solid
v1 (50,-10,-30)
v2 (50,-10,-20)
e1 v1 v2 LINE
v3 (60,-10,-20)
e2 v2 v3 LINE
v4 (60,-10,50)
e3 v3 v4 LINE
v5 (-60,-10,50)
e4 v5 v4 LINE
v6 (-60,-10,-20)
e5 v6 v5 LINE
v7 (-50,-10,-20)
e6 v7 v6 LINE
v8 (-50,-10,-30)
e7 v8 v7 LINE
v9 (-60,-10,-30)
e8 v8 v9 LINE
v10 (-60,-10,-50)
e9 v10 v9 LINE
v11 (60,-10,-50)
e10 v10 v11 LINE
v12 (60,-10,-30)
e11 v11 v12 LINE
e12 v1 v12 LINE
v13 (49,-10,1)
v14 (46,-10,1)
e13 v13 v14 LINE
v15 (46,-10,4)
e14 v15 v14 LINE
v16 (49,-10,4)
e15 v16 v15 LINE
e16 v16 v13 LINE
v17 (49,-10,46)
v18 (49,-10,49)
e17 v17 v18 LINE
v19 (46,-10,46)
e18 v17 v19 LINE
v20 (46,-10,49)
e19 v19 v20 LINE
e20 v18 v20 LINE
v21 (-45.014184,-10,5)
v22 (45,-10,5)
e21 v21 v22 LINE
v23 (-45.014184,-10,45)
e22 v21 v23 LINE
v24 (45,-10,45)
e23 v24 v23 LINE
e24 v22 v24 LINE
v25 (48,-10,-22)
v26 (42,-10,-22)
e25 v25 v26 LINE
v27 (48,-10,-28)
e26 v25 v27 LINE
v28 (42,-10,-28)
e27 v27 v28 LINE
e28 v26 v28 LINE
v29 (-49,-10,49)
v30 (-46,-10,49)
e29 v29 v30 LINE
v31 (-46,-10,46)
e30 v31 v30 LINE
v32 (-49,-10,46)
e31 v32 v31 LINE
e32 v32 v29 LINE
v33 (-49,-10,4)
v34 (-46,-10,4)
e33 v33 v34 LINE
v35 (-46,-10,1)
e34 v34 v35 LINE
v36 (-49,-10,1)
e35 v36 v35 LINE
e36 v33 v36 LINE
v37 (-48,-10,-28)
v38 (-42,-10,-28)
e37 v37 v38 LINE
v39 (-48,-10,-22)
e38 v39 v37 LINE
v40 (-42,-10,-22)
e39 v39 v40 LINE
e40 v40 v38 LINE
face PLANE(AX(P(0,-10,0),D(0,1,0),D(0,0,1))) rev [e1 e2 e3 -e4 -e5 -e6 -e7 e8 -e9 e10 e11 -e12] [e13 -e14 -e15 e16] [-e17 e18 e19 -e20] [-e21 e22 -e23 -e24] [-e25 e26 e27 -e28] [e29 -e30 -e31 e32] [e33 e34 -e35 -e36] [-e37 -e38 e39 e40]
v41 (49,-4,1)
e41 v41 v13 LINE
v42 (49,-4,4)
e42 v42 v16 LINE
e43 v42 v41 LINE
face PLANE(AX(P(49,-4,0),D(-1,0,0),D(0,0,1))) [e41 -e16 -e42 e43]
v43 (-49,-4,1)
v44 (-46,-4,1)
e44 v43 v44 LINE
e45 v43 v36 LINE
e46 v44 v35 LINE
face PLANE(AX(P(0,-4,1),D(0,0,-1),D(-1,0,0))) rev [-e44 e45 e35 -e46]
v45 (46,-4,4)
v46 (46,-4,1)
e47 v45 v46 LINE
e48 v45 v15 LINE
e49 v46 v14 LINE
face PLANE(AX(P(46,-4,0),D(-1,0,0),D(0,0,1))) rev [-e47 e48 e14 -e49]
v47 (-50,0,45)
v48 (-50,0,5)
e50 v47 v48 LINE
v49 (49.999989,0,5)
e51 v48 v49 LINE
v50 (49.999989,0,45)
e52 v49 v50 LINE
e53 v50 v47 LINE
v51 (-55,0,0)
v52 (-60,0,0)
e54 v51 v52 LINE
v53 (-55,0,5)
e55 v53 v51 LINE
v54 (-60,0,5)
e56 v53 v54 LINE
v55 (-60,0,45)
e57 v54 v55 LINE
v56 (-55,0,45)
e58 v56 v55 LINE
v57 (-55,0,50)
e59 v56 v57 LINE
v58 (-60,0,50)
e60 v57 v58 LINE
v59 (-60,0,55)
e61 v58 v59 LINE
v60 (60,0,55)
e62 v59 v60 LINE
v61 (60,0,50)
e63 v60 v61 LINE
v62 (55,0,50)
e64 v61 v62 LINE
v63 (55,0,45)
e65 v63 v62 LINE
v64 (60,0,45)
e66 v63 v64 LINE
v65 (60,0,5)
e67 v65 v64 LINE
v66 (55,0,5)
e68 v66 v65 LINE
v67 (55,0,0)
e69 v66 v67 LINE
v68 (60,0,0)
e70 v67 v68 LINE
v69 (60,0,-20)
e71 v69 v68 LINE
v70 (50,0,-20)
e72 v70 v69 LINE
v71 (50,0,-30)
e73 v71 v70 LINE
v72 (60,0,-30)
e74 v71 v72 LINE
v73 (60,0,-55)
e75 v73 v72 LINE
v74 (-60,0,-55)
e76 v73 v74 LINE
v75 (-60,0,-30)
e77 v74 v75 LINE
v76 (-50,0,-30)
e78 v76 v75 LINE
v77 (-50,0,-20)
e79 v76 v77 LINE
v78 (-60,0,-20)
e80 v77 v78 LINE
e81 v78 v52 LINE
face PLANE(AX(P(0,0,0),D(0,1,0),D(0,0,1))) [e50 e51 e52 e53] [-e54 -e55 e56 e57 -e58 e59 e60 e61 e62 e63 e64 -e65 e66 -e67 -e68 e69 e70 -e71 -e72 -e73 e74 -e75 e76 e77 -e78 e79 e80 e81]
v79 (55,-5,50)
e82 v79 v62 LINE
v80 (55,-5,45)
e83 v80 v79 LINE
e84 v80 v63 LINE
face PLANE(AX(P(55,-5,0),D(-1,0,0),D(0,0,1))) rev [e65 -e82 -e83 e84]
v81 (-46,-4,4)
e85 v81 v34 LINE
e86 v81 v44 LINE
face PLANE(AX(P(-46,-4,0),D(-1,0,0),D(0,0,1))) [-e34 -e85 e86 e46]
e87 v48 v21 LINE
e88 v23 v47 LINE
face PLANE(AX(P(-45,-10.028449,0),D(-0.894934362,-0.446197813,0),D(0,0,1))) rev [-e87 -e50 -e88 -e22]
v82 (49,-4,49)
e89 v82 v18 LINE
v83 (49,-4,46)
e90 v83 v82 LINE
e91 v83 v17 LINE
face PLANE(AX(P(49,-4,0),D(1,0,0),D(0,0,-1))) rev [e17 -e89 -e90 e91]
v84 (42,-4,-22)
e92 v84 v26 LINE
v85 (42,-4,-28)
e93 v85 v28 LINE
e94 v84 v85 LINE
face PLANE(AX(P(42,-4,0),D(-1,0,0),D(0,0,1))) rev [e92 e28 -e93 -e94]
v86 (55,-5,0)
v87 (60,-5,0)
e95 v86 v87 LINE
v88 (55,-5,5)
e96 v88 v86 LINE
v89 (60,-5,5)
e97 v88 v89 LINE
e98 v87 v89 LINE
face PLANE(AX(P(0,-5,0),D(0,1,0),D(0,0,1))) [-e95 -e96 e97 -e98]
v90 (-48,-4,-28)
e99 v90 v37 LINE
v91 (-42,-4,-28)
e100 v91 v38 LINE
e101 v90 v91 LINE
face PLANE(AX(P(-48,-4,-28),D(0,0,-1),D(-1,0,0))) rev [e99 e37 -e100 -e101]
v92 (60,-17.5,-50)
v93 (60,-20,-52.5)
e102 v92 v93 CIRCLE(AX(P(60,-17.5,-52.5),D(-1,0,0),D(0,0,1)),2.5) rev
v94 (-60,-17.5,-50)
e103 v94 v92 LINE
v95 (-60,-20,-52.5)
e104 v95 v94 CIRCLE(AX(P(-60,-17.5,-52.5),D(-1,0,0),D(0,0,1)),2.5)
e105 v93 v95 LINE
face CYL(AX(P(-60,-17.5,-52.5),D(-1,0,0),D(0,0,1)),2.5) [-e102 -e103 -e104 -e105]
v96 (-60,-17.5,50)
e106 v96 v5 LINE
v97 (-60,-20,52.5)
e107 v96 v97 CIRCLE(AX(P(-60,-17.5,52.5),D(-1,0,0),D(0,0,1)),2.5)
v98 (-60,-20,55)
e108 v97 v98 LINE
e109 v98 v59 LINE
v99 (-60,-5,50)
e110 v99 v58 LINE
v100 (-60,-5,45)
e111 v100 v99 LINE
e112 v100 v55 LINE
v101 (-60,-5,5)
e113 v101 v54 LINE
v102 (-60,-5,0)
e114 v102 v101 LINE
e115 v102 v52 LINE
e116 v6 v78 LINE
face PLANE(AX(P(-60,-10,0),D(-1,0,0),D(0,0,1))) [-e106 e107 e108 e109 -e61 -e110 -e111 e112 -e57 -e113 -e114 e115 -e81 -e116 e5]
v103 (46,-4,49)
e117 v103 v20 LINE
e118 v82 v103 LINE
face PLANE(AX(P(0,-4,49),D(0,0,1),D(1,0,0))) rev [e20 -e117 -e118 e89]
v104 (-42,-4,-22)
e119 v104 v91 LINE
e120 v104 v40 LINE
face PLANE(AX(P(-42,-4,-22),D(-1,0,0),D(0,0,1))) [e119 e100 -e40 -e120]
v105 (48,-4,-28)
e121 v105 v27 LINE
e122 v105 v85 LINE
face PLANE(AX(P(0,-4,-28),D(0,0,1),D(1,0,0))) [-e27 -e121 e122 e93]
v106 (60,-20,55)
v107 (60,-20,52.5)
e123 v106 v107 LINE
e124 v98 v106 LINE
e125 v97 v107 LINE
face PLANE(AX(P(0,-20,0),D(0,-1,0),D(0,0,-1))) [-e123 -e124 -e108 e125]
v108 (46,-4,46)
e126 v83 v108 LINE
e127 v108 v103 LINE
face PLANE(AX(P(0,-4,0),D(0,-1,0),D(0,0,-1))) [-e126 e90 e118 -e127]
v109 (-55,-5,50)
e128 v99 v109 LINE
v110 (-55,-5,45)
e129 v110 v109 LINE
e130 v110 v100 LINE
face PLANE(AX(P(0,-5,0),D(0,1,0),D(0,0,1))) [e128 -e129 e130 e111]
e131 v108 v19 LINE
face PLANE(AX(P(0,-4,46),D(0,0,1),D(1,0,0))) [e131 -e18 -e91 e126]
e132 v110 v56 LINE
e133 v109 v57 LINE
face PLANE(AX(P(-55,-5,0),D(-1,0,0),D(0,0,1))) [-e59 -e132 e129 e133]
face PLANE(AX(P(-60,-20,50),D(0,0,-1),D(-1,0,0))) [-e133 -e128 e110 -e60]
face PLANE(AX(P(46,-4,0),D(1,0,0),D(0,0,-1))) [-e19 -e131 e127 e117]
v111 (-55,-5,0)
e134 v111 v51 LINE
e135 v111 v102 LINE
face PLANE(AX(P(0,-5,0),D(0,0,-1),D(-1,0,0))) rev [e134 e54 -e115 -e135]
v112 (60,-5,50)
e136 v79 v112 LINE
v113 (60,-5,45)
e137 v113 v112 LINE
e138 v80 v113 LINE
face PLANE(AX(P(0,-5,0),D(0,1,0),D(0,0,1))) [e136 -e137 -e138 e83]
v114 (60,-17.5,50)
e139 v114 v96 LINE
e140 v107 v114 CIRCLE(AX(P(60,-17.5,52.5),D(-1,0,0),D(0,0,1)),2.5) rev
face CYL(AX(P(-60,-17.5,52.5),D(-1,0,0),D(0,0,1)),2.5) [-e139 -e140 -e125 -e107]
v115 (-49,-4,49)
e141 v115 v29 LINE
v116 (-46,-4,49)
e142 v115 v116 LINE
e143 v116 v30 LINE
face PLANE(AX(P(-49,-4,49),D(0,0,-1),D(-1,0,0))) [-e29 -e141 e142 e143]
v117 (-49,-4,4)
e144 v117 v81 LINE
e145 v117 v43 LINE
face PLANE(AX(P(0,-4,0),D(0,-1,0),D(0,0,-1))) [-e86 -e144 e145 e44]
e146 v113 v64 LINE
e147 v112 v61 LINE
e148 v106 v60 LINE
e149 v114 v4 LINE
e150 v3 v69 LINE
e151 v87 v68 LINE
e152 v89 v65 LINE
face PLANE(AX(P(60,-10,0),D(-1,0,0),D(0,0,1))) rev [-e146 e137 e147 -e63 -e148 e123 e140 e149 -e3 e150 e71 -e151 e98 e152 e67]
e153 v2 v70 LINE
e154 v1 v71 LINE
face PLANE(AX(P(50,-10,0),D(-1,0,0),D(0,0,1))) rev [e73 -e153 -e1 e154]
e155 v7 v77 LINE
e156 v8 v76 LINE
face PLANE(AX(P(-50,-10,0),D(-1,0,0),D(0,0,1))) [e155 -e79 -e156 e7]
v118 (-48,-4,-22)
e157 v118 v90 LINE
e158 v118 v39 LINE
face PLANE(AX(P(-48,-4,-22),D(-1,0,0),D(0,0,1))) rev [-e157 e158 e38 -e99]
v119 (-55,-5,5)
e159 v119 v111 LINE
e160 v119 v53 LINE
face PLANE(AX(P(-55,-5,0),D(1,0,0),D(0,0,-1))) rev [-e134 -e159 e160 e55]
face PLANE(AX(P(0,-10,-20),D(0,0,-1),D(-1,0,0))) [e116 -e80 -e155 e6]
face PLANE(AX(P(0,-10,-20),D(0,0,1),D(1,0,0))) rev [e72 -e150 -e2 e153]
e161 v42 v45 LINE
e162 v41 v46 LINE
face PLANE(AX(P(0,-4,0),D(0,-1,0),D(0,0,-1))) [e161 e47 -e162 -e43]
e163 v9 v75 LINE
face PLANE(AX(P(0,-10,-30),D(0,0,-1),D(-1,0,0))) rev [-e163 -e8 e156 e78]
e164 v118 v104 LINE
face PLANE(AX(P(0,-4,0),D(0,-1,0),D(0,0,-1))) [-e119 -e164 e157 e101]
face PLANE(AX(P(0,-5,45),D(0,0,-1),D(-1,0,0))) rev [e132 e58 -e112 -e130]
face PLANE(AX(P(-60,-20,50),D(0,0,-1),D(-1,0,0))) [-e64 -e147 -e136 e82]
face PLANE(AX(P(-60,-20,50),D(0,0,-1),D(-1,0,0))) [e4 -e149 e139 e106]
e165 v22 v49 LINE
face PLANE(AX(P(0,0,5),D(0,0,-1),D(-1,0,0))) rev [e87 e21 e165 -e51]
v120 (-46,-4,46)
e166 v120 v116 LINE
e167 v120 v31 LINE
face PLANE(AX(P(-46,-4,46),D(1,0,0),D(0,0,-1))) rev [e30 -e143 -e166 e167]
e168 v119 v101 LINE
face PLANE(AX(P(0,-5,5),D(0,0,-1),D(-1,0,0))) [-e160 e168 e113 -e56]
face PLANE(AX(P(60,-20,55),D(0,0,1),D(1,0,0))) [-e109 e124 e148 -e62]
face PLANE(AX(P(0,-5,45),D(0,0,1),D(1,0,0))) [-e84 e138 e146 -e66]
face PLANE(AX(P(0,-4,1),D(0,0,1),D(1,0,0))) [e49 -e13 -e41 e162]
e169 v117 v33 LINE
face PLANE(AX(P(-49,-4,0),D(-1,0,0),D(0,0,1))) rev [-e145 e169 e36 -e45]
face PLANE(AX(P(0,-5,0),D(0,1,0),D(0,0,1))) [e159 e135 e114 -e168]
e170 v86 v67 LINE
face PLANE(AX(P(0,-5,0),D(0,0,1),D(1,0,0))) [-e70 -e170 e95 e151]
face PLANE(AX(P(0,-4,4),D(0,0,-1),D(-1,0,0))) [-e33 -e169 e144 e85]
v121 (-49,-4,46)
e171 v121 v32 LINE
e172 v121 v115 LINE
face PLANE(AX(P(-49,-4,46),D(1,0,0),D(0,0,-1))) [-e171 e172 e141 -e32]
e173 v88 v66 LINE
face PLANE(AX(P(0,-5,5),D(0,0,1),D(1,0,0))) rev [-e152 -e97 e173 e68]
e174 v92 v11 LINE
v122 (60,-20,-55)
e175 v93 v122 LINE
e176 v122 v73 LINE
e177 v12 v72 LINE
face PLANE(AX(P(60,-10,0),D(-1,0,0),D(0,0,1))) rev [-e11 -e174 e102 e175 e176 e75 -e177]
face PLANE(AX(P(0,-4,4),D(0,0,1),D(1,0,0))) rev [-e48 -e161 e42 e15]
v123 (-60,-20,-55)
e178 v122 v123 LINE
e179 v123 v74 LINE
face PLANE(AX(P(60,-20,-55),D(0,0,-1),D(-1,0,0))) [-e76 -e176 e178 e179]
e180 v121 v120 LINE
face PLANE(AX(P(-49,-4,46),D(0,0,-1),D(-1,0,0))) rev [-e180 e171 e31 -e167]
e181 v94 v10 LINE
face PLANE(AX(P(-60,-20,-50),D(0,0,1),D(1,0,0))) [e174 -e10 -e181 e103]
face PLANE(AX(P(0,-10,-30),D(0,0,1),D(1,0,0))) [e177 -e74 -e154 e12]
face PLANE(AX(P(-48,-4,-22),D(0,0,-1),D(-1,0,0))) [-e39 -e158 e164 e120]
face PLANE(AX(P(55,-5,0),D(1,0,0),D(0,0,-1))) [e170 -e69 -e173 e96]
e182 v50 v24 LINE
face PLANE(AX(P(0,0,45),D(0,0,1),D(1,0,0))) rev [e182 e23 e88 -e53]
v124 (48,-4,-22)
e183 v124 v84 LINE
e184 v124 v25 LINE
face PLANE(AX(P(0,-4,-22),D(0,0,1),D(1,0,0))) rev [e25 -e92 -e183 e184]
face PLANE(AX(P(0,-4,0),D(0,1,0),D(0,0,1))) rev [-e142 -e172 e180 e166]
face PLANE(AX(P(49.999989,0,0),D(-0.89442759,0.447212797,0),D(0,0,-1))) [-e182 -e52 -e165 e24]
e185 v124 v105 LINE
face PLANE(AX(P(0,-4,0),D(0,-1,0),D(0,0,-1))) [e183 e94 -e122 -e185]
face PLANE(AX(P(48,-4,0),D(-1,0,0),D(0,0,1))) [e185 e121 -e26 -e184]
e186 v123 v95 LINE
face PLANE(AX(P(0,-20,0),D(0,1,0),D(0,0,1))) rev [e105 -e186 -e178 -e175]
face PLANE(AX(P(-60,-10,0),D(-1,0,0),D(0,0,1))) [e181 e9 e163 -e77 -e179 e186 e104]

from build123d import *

# Parameters (mm, degrees)
BOSS_EXTRUDE1_DEPTH = 10
CUT_EXTRUDE1_DEPTH  = 10
SKETCH2_3_W         = 3
SKETCH2_3_H         = 3
SKETCH2_3_W_2       = 6
SKETCH2_3_H_2       = 6
CUT_EXTRUDE2_DEPTH  = 6
CHAMFER2_SIZE       = 5
CHAMFER2_SIZE_2     = 10.028448541
CHAMFER3_SIZE2      = 4.999988835
CHAMFER3_SIZE       = 10
SKETCH1_6_W         = 6
SKETCH1_6_H         = 3
SKETCH1_6_W_2       = 10
SKETCH1_6_H_2       = 10
SKETCH1_6_H_3       = 6
CUT_EXTRUDE3_DEPTH  = 10
SKETCH1_7_W         = 5
SKETCH1_7_H         = 5
CUT_EXTRUDE4_DEPTH  = 5
SKETCH5_W           = 120
SKETCH5_H           = 5
BOSS_EXTRUDE3_DEPTH = 20
FILLET2_R           = 2.5


# Some blends are built 0.0001 mm under size
with BuildPart() as part:
    # Sketch1 → Boss-Extrude1 (new body)
    with BuildSketch(Plane(origin=(0, 0, 0), x_dir=(1, 0, 0), z_dir=(0, 1, 0))):
        Polygon((-60, 50), (-60, -2.5), (-60, -50), (0, -50), (60, -50), (60, 50), (0, 50), align=None)
    extrude(amount=-BOSS_EXTRUDE1_DEPTH)

    # Sketch2 → Cut-Extrude1 (cut)
    with BuildSketch(Plane.XZ.offset(10)):
        Polygon((45, 45), (-45, 45), (-45, 5), (-40, 5), (45, 5), (45, 25), align=None)
    extrude(amount=-CUT_EXTRUDE1_DEPTH, mode=Mode.SUBTRACT)

    # Sketch2<3> → Cut-Extrude2 (cut)
    with BuildSketch(Plane.XZ.offset(10)):
        with Locations((47.5, 47.5)):
            Rectangle(SKETCH2_3_W, SKETCH2_3_H)
        with Locations((-47.5, 2.5)):
            Rectangle(SKETCH2_3_W, SKETCH2_3_H)
        with Locations((47.5, 2.5)):
            Rectangle(SKETCH2_3_W, SKETCH2_3_H)
        with Locations((45, -25)):
            Rectangle(SKETCH2_3_W_2, SKETCH2_3_H_2)
        with Locations((-47.5, 47.5)):
            Rectangle(SKETCH2_3_W, SKETCH2_3_H)
        with Locations((-45, -25)):
            Rectangle(SKETCH2_3_W_2, SKETCH2_3_H_2)
    extrude(amount=-CUT_EXTRUDE2_DEPTH, mode=Mode.SUBTRACT)

    # Chamfer2
    # the kernel refuses this chamfer: 10.028448541, 5 mm, written as the material it takes off along each edge
    with BuildSketch(Plane(origin=(-45, 0, 45), x_dir=(-0.9976061957759285, 0.06915112543899754, 0), z_dir=(0, 0, -1))) as chamfer2_piece_1:
        Polygon((CHAMFER2_SIZE * 0.997606195776, -CHAMFER2_SIZE * 0.069151125439), (-CHAMFER2_SIZE_2 * 0.069151125441, -CHAMFER2_SIZE_2 * 0.997606195805), (0, 0), align=None)
    extrude(amount=40, mode=Mode.SUBTRACT)

    # Chamfer3
    chamfer3_edges = [part.edges().sort_by_distance(p)[0] for p in [
        (45, 0, 25),
    ]]
    chamfer3_side = [part.faces().sort_by_distance(p)[0] for p in [
        (45, -0.099999777, 25),
    ]]
    chamfer(chamfer3_edges, length=CHAMFER3_SIZE - 0.0001, length2=CHAMFER3_SIZE2 - 0.0001, reference=chamfer3_side[0])  # a hair under: the kernel refuses the full size

    # Sketch1<6> → Cut-Extrude3 (cut)
    # profile 1 of 6: a face of its own
    with BuildSketch(Plane(origin=(0, 0, 0), x_dir=(1, 0, 0), z_dir=(0, 1, 0))):
        Polygon((-50, 25), (-50, 30), (-60, 30), (-60, 25), (-58, 25), (-58, 28), (-52, 28), (-52, 25), align=None)
    # profile 2 of 6: a face of its own
    with BuildSketch(Plane(origin=(0, 0, 0), x_dir=(1, 0, 0), z_dir=(0, 1, 0))):
        with Locations((-55, 26.5)):
            Rectangle(SKETCH1_6_W, SKETCH1_6_H)
    # profile 3 of 6: a face of its own
    with BuildSketch(Plane(origin=(0, 0, 0), x_dir=(1, 0, 0), z_dir=(0, 1, 0))):
        with Locations((-55, 23.5)):
            Rectangle(SKETCH1_6_W, SKETCH1_6_H)
    # profile 4 of 6: a face of its own
    with BuildSketch(Plane(origin=(0, 0, 0), x_dir=(1, 0, 0), z_dir=(0, 1, 0))):
        Polygon((-50, 20), (-50, 25), (-52, 25), (-52, 22), (-58, 22), (-58, 25), (-60, 25), (-60, 20), (-55, 20), align=None)
    # profile 5 of 6: a face of its own
    with BuildSketch(Plane(origin=(0, 0, 0), x_dir=(1, 0, 0), z_dir=(0, 1, 0))):
        with Locations((55, 25)):
            Rectangle(SKETCH1_6_W_2, SKETCH1_6_H_2)
        with Locations((55, 25)):
            Rectangle(SKETCH1_6_W, SKETCH1_6_H_3, mode=Mode.SUBTRACT)
    # profile 6 of 6: a face of its own
    with BuildSketch(Plane(origin=(0, 0, 0), x_dir=(1, 0, 0), z_dir=(0, 1, 0))):
        with Locations((55, 25)):
            Rectangle(SKETCH1_6_W, SKETCH1_6_H_3)
    extrude(amount=-CUT_EXTRUDE3_DEPTH, mode=Mode.SUBTRACT)

    # Sketch1<7> → Cut-Extrude4 (cut)
    with BuildSketch(Plane(origin=(0, 0, 0), x_dir=(1, 0, 0), z_dir=(0, 1, 0))):
        with Locations((57.5, -2.5)):
            Rectangle(SKETCH1_7_W, SKETCH1_7_H)
        with Locations((57.5, -47.5)):
            Rectangle(SKETCH1_7_W, SKETCH1_7_H)
        with Locations((-57.5, -47.5)):
            Rectangle(SKETCH1_7_W, SKETCH1_7_H)
        Polygon((-55, -5), (-55, 0), (-60, 0), (-60, -2.5), (-60, -5), align=None)
    extrude(amount=-CUT_EXTRUDE4_DEPTH, mode=Mode.SUBTRACT)

    # Sketch5 → Boss-Extrude3 (add)
    with BuildSketch(Plane(origin=(0, 0, 0), x_dir=(1, 0, 0), z_dir=(0, 1, 0))):
        with Locations((0, -52.5)):
            Rectangle(SKETCH5_W, SKETCH5_H)
        with Locations((0, 52.5)):
            Rectangle(SKETCH5_W, SKETCH5_H)
    extrude(amount=-BOSS_EXTRUDE3_DEPTH)

    # Fillet2
    fillet2_edges = [part.edges().sort_by_distance(p)[0] for p in [
        (0, -20, 50),
        (0, -20, -50),
    ]]
    fillet(fillet2_edges, radius=FILLET2_R)


solid = part.part
